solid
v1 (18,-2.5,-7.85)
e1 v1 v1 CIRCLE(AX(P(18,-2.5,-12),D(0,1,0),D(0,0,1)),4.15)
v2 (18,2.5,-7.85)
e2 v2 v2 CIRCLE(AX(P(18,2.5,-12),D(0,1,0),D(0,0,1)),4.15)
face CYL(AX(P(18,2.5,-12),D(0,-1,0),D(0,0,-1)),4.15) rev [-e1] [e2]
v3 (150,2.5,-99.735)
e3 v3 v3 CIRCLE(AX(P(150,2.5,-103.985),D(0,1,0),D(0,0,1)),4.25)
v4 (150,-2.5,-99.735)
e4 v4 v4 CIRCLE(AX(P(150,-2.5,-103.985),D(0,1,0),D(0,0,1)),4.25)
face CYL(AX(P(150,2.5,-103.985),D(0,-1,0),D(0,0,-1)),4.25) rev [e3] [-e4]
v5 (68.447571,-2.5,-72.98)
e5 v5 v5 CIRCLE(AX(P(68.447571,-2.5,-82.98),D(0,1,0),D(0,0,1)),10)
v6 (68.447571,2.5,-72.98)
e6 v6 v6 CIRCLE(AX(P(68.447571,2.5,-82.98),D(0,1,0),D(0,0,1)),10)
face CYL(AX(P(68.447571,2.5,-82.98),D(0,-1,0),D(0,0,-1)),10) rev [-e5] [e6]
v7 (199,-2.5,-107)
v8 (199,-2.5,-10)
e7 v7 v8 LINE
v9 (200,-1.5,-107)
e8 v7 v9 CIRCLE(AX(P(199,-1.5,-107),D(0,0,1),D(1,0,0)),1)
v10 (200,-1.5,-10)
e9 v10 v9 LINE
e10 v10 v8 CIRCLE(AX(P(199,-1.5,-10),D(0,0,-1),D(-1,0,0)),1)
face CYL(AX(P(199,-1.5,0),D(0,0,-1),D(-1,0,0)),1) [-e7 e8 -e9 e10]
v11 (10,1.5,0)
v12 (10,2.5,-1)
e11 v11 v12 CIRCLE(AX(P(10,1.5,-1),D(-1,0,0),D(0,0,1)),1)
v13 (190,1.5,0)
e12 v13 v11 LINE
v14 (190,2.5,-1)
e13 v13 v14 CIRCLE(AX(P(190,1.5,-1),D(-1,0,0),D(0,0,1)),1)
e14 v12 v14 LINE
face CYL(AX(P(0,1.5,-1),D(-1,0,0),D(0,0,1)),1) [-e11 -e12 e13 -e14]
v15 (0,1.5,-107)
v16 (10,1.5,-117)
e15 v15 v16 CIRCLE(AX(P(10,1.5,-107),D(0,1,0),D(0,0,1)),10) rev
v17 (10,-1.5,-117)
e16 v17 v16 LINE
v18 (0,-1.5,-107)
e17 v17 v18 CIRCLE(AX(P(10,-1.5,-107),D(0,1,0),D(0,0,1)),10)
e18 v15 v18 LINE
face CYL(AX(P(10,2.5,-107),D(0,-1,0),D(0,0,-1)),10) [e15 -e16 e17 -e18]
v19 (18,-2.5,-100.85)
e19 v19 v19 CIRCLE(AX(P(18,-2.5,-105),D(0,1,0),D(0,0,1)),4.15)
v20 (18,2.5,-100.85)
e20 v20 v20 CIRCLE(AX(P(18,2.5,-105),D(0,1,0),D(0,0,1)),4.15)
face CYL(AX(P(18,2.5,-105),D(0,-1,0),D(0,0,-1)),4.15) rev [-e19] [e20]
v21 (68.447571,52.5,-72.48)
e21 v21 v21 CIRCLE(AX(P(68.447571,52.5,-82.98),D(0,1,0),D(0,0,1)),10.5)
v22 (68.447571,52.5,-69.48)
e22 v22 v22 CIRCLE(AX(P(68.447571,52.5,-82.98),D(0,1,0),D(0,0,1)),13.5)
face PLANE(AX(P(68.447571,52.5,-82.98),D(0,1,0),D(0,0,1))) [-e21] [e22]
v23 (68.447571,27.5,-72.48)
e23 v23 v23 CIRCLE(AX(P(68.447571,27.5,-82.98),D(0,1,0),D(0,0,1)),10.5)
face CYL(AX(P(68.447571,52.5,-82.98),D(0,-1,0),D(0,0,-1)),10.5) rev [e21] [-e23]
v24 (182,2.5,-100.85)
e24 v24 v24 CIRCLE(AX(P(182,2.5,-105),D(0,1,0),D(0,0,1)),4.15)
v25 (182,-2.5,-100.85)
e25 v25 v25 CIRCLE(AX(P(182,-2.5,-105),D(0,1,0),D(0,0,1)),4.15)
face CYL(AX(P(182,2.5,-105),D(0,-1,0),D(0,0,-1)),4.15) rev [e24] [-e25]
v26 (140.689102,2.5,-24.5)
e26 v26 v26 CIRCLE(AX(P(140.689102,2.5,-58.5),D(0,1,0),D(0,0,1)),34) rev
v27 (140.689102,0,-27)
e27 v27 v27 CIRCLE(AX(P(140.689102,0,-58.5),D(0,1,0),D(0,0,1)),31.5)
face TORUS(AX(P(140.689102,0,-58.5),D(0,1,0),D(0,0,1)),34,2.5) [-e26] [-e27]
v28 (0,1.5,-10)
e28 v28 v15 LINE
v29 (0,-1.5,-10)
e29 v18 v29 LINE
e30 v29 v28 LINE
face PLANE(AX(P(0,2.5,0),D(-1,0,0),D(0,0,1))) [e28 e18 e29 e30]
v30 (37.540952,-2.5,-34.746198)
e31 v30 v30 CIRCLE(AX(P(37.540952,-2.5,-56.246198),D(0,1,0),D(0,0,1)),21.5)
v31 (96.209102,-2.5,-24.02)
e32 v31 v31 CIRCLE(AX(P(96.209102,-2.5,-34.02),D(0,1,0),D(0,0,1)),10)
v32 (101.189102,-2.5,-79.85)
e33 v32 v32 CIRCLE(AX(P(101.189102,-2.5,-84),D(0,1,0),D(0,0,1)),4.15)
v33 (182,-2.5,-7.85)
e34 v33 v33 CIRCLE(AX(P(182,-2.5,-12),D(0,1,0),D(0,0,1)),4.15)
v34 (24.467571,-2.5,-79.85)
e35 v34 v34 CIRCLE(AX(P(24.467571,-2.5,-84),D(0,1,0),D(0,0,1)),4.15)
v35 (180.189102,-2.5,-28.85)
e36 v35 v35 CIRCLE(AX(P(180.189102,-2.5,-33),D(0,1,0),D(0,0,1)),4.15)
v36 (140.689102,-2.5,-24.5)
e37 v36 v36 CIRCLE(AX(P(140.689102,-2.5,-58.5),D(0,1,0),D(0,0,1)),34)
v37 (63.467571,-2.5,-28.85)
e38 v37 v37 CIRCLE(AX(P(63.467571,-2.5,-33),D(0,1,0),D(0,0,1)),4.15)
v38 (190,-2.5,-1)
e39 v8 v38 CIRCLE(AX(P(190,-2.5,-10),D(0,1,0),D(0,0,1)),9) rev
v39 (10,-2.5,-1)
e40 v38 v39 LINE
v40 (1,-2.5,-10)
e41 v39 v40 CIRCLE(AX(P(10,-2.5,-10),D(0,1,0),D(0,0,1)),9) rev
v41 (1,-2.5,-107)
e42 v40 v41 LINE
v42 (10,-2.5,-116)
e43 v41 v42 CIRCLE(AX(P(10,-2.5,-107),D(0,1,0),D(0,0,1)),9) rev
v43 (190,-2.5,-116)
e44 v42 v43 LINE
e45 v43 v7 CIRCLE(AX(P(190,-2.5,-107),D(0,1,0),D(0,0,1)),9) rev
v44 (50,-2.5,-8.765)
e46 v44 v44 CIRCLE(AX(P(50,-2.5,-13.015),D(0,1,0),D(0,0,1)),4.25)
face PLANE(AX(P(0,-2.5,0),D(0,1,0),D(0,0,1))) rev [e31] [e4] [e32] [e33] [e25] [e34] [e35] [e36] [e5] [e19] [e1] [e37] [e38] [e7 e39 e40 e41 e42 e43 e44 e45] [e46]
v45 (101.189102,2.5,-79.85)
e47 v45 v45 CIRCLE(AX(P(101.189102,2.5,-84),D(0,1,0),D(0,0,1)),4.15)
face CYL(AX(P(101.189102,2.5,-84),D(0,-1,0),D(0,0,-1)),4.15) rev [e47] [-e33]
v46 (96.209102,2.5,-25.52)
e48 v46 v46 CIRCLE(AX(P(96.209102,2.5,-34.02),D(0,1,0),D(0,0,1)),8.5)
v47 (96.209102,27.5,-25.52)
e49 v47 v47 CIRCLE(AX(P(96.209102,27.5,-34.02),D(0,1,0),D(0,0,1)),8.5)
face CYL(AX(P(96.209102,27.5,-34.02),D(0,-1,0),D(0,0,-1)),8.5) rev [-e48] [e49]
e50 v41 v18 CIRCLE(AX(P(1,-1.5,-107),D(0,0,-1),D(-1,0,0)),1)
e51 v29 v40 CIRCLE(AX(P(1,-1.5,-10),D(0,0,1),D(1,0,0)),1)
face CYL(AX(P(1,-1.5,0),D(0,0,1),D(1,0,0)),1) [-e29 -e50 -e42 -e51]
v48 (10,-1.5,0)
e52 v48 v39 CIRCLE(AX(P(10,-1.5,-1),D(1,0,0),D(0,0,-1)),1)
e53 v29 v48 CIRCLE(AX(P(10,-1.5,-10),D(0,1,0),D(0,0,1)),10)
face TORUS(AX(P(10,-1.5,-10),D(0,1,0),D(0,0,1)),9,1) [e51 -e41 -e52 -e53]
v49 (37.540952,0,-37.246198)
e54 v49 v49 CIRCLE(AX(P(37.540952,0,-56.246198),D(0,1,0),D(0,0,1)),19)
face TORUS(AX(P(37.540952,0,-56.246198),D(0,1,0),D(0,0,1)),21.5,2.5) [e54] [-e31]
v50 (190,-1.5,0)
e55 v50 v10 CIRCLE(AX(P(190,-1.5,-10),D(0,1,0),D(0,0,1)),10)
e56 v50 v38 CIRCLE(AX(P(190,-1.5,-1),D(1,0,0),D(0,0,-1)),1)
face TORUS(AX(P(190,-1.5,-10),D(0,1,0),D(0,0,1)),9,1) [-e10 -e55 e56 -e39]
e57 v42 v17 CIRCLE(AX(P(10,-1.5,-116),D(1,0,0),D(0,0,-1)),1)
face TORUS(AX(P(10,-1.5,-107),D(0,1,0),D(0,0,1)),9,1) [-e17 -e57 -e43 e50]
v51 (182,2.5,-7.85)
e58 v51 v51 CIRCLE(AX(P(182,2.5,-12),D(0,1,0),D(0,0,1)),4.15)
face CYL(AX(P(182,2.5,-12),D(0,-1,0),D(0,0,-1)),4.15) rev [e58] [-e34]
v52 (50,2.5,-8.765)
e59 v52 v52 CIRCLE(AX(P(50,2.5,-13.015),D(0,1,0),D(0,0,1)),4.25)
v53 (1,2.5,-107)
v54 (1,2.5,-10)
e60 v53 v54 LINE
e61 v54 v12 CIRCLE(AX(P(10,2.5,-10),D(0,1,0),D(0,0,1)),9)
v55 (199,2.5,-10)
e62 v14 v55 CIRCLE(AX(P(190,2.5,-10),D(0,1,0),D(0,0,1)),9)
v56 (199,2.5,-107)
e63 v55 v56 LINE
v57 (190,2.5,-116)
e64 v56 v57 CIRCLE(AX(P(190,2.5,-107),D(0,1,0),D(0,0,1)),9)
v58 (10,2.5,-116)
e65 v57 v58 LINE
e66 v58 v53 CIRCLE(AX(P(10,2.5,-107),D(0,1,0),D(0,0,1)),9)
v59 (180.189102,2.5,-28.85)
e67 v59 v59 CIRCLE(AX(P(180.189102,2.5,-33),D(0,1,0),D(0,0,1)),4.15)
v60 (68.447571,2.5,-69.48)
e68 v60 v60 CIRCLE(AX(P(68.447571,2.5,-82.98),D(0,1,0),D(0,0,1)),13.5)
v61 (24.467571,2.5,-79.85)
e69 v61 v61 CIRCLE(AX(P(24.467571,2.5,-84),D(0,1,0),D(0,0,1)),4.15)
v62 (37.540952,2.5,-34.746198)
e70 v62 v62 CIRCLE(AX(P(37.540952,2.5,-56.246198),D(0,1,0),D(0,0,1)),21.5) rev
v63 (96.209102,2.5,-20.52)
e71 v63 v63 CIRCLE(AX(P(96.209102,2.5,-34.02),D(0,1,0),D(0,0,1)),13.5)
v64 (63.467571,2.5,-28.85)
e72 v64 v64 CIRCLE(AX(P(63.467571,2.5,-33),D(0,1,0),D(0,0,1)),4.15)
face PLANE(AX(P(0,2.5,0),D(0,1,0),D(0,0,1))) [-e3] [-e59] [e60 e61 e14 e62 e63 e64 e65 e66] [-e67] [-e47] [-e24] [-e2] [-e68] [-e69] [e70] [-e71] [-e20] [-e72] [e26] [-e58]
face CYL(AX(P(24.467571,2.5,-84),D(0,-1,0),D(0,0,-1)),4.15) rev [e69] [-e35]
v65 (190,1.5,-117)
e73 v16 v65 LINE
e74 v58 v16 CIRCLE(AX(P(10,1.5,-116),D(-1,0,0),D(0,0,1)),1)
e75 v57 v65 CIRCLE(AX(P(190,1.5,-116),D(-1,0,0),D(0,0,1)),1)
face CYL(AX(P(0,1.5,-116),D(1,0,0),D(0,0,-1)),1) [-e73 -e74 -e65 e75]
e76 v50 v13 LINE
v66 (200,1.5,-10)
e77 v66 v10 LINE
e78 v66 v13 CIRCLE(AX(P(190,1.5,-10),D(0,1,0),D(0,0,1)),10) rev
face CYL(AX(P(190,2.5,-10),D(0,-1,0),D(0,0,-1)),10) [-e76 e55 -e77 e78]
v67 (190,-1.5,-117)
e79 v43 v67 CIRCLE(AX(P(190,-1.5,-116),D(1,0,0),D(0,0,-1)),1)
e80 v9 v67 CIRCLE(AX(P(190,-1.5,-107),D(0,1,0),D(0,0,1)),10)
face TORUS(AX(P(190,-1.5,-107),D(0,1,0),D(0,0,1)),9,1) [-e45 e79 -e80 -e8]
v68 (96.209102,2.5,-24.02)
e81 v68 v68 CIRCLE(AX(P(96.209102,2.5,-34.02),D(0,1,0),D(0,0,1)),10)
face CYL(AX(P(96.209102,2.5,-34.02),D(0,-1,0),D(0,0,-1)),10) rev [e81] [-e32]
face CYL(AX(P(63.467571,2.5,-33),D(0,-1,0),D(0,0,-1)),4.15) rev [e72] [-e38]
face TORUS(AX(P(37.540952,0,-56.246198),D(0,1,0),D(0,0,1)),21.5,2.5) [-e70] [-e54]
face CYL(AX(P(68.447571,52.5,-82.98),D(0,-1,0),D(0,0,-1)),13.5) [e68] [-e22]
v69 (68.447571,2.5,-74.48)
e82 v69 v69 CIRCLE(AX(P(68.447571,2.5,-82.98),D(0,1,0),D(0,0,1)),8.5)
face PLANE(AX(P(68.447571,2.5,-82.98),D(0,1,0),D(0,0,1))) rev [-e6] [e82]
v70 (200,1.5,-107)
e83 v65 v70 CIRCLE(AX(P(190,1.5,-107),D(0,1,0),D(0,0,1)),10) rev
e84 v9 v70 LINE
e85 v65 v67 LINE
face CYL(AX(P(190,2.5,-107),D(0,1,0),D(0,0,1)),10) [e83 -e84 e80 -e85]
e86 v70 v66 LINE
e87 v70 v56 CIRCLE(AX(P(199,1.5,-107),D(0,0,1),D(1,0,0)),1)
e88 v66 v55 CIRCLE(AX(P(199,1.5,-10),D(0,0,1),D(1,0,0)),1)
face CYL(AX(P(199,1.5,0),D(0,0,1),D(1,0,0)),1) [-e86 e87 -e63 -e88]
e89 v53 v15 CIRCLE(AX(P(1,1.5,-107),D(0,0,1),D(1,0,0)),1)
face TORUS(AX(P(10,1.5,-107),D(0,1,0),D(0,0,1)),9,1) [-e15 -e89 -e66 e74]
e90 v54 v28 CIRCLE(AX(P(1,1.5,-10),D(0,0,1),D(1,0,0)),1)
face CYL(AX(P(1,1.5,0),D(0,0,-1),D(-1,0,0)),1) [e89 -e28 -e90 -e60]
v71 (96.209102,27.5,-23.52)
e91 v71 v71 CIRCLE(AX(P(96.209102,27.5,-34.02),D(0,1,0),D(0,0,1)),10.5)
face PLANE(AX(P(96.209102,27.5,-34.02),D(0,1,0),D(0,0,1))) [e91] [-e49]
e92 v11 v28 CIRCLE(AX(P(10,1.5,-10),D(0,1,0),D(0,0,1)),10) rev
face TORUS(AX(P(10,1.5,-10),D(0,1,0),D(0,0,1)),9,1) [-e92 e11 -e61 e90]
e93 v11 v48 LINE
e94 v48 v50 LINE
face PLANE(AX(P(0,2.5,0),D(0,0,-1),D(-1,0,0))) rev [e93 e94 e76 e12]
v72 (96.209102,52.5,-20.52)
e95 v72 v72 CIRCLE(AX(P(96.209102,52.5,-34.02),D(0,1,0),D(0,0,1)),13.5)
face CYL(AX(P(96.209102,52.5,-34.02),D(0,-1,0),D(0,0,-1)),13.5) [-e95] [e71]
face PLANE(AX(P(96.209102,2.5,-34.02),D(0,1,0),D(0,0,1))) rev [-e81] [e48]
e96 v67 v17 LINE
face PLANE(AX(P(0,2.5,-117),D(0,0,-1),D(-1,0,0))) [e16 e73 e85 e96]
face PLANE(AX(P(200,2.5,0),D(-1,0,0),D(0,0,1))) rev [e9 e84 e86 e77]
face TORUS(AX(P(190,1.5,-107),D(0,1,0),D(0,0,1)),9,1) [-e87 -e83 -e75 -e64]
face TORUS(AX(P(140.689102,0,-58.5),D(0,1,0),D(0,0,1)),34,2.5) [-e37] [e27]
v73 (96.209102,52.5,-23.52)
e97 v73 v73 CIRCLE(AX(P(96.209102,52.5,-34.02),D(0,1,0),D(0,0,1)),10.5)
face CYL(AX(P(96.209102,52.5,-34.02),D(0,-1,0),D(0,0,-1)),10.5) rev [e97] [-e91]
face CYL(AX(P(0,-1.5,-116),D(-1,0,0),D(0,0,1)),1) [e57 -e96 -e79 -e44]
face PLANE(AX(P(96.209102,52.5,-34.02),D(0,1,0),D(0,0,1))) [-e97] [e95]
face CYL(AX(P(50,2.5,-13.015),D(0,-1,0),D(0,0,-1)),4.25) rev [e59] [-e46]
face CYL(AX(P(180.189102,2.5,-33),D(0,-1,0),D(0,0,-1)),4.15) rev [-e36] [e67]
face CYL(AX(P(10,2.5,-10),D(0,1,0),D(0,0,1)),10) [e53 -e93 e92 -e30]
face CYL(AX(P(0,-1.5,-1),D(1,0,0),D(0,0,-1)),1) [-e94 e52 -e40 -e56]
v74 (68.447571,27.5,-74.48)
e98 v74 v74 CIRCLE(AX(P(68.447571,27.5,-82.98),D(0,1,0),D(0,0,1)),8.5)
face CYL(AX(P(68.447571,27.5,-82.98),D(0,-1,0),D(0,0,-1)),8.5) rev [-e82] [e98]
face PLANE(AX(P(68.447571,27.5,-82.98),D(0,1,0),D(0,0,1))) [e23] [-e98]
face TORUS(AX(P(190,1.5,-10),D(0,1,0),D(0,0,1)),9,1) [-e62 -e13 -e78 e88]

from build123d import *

# Parameters (mm, degrees)
SKETCH1_W           = 200
SKETCH1_H           = 117
SKETCH1_R           = 4.15
SKETCH1_R_2         = 4.25
SKETCH1_R_3         = 10
BOSS_EXTRUDE1_DEPTH = 2.5
SKETCH3_R           = 13.5
SKETCH3_R_2         = 10.5
BOSS_EXTRUDE3_DEPTH = 50
SKETCH4_R           = 10.5
SKETCH4_R_2         = 8.5
BOSS_EXTRUDE4_DEPTH = 25
FILLET1_R           = 10
FILLET2_R           = 1
SKETCH5_R           = 19
SKETCH5_R_2         = 31.5
CUT_EXTRUDE3_DEPTH  = 123
FILLET4_R           = 2.5


with BuildPart() as part:
    # Sketch1 → Boss-Extrude1 (new, symmetric)
    with BuildSketch(Plane(origin=(0, 0, 0), x_dir=(1, 0, 0), z_dir=(0, 1, 0))):
        with Locations((100, 58.5)):
            Rectangle(SKETCH1_W, SKETCH1_H)
        with Locations(Location((18, 105, 0), (0, 0, 270))):
            Circle(SKETCH1_R, mode=Mode.SUBTRACT)
        with Locations(Location((18, 12, 0), (0, 0, 270))):
            Circle(SKETCH1_R, mode=Mode.SUBTRACT)
        with Locations(Location((182, 105, 0), (0, 0, 270))):
            Circle(SKETCH1_R, mode=Mode.SUBTRACT)
        with Locations(Location((182, 12, 0), (0, 0, 270))):
            Circle(SKETCH1_R, mode=Mode.SUBTRACT)
        with Locations(Location((24.46757137, 84, 0), (0, 0, 270))):
            Circle(SKETCH1_R, mode=Mode.SUBTRACT)
        with Locations(Location((63.46757137, 33, 0), (0, 0, 270))):
            Circle(SKETCH1_R, mode=Mode.SUBTRACT)
        with Locations(Location((101.1891021, 84, 0), (0, 0, 270))):
            Circle(SKETCH1_R, mode=Mode.SUBTRACT)
        with Locations(Location((180.1891021, 33, 0), (0, 0, 270))):
            Circle(SKETCH1_R, mode=Mode.SUBTRACT)
        with Locations(Location((50, 13.015, 0), (0, 0, 270))):
            Circle(SKETCH1_R_2, mode=Mode.SUBTRACT)
        with Locations(Location((150, 103.985, 0), (0, 0, 270))):
            Circle(SKETCH1_R_2, mode=Mode.SUBTRACT)
        with Locations(Location((68.44757137, 82.98, 0), (0, 0, 270))):
            Circle(SKETCH1_R_3, mode=Mode.SUBTRACT)
        with Locations(Location((96.2091021, 34.02, 0), (0, 0, 270))):
            Circle(SKETCH1_R_3, mode=Mode.SUBTRACT)
    extrude(amount=BOSS_EXTRUDE1_DEPTH, both=True)

    # Sketch3 → Boss-Extrude3 (add)
    # profile 1 of 2: a face of its own
    with BuildSketch(Plane(origin=(0, 2.5, 0), x_dir=(1, 0, 0), z_dir=(0, 1, 0))):
        with Locations(Location((68.44757137, 82.98, 0), (0, 0, 270))):
            Circle(SKETCH3_R)
        with Locations(Location((68.44757137, 82.98, 0), (0, 0, 270))):
            Circle(SKETCH3_R_2, mode=Mode.SUBTRACT)
    # profile 2 of 2: a face of its own
    with BuildSketch(Plane(origin=(0, 2.5, 0), x_dir=(1, 0, 0), z_dir=(0, 1, 0))):
        with Locations(Location((96.2091021, 34.02, 0), (0, 0, 270))):
            Circle(SKETCH3_R)
        with Locations(Location((96.2091021, 34.02, 0), (0, 0, 270))):
            Circle(SKETCH3_R_2, mode=Mode.SUBTRACT)
    extrude(amount=BOSS_EXTRUDE3_DEPTH)

    # Sketch4 → Boss-Extrude4 (add)
    # profile 1 of 2: a face of its own
    with BuildSketch(Plane(origin=(0, 2.5, 0), x_dir=(1, 0, 0), z_dir=(0, 1, 0))):
        with Locations(Location((68.44757137, 82.98, 0), (0, 0, 270))):
            Circle(SKETCH4_R)
        with Locations(Location((68.44757137, 82.98, 0), (0, 0, 270))):
            Circle(SKETCH4_R_2, mode=Mode.SUBTRACT)
    # profile 2 of 2: a face of its own
    with BuildSketch(Plane(origin=(0, 2.5, 0), x_dir=(1, 0, 0), z_dir=(0, 1, 0))):
        with Locations(Location((96.2091021, 34.02, 0), (0, 0, 270))):
            Circle(SKETCH4_R)
        with Locations(Location((96.2091021, 34.02, 0), (0, 0, 270))):
            Circle(SKETCH4_R_2, mode=Mode.SUBTRACT)
    extrude(amount=BOSS_EXTRUDE4_DEPTH)

    # Fillet1
    fillet1_edges = [part.edges().sort_by_distance(p)[0] for p in [
        (0, 0, -117),
        (0, 0, 0),
        (200, 0, 0),
        (200, 0, -117),
    ]]
    fillet(fillet1_edges, radius=FILLET1_R)

    # Fillet2
    fillet2_edges = [part.edges().sort_by_distance(p)[0] for p in [
        (197.071067812, -2.5, -2.928932188),
        (197.071067812, -2.5, -114.071067812),
        (2.928932188, -2.5, -114.071067812),
        (2.928932188, -2.5, -2.928932188),
        (0, 2.5, -58.5),
        (100, 2.5, -117),
        (200, 2.5, -58.5),
        (197.071067812, 2.5, -2.928932188),
        (197.071067812, 2.5, -114.071067812),
        (2.928932188, 2.5, -114.071067812),
        (2.928932188, 2.5, -2.928932188),
        (100, -2.5, 0),
        (100, 2.5, 0),
        (100, -2.5, -117),
        (200, -2.5, -58.5),
        (0, -2.5, -58.5),
    ]]
    fillet(fillet2_edges, radius=FILLET2_R)

    # Sketch5 → Cut-Extrude3 (cut)
    with BuildSketch(Plane(origin=(0, 2.5, 0), x_dir=(1, 0, 0), z_dir=(0, 1, 0))):
        with Locations(Location((37.540951665, 56.246198102, 0), (0, 0, 270))):
            Circle(SKETCH5_R)
        with Locations(Location((140.6891021, 58.5, 0), (0, 0, 270))):
            Circle(SKETCH5_R_2)
    extrude(amount=-CUT_EXTRUDE3_DEPTH, mode=Mode.SUBTRACT)

    # Fillet4
    fillet4_edges = [part.edges().sort_by_distance(p)[0] for p in [
        (37.540951665, -2.5, -75.246198102),
        (37.540951665, 2.5, -75.246198102),
        (140.6891021, -2.5, -90),
        (140.6891021, 2.5, -90),
    ]]
    fillet(fillet4_edges, radius=FILLET4_R - 0.0001)  # a hair under: the kernel refuses the full size


solid = part.part
